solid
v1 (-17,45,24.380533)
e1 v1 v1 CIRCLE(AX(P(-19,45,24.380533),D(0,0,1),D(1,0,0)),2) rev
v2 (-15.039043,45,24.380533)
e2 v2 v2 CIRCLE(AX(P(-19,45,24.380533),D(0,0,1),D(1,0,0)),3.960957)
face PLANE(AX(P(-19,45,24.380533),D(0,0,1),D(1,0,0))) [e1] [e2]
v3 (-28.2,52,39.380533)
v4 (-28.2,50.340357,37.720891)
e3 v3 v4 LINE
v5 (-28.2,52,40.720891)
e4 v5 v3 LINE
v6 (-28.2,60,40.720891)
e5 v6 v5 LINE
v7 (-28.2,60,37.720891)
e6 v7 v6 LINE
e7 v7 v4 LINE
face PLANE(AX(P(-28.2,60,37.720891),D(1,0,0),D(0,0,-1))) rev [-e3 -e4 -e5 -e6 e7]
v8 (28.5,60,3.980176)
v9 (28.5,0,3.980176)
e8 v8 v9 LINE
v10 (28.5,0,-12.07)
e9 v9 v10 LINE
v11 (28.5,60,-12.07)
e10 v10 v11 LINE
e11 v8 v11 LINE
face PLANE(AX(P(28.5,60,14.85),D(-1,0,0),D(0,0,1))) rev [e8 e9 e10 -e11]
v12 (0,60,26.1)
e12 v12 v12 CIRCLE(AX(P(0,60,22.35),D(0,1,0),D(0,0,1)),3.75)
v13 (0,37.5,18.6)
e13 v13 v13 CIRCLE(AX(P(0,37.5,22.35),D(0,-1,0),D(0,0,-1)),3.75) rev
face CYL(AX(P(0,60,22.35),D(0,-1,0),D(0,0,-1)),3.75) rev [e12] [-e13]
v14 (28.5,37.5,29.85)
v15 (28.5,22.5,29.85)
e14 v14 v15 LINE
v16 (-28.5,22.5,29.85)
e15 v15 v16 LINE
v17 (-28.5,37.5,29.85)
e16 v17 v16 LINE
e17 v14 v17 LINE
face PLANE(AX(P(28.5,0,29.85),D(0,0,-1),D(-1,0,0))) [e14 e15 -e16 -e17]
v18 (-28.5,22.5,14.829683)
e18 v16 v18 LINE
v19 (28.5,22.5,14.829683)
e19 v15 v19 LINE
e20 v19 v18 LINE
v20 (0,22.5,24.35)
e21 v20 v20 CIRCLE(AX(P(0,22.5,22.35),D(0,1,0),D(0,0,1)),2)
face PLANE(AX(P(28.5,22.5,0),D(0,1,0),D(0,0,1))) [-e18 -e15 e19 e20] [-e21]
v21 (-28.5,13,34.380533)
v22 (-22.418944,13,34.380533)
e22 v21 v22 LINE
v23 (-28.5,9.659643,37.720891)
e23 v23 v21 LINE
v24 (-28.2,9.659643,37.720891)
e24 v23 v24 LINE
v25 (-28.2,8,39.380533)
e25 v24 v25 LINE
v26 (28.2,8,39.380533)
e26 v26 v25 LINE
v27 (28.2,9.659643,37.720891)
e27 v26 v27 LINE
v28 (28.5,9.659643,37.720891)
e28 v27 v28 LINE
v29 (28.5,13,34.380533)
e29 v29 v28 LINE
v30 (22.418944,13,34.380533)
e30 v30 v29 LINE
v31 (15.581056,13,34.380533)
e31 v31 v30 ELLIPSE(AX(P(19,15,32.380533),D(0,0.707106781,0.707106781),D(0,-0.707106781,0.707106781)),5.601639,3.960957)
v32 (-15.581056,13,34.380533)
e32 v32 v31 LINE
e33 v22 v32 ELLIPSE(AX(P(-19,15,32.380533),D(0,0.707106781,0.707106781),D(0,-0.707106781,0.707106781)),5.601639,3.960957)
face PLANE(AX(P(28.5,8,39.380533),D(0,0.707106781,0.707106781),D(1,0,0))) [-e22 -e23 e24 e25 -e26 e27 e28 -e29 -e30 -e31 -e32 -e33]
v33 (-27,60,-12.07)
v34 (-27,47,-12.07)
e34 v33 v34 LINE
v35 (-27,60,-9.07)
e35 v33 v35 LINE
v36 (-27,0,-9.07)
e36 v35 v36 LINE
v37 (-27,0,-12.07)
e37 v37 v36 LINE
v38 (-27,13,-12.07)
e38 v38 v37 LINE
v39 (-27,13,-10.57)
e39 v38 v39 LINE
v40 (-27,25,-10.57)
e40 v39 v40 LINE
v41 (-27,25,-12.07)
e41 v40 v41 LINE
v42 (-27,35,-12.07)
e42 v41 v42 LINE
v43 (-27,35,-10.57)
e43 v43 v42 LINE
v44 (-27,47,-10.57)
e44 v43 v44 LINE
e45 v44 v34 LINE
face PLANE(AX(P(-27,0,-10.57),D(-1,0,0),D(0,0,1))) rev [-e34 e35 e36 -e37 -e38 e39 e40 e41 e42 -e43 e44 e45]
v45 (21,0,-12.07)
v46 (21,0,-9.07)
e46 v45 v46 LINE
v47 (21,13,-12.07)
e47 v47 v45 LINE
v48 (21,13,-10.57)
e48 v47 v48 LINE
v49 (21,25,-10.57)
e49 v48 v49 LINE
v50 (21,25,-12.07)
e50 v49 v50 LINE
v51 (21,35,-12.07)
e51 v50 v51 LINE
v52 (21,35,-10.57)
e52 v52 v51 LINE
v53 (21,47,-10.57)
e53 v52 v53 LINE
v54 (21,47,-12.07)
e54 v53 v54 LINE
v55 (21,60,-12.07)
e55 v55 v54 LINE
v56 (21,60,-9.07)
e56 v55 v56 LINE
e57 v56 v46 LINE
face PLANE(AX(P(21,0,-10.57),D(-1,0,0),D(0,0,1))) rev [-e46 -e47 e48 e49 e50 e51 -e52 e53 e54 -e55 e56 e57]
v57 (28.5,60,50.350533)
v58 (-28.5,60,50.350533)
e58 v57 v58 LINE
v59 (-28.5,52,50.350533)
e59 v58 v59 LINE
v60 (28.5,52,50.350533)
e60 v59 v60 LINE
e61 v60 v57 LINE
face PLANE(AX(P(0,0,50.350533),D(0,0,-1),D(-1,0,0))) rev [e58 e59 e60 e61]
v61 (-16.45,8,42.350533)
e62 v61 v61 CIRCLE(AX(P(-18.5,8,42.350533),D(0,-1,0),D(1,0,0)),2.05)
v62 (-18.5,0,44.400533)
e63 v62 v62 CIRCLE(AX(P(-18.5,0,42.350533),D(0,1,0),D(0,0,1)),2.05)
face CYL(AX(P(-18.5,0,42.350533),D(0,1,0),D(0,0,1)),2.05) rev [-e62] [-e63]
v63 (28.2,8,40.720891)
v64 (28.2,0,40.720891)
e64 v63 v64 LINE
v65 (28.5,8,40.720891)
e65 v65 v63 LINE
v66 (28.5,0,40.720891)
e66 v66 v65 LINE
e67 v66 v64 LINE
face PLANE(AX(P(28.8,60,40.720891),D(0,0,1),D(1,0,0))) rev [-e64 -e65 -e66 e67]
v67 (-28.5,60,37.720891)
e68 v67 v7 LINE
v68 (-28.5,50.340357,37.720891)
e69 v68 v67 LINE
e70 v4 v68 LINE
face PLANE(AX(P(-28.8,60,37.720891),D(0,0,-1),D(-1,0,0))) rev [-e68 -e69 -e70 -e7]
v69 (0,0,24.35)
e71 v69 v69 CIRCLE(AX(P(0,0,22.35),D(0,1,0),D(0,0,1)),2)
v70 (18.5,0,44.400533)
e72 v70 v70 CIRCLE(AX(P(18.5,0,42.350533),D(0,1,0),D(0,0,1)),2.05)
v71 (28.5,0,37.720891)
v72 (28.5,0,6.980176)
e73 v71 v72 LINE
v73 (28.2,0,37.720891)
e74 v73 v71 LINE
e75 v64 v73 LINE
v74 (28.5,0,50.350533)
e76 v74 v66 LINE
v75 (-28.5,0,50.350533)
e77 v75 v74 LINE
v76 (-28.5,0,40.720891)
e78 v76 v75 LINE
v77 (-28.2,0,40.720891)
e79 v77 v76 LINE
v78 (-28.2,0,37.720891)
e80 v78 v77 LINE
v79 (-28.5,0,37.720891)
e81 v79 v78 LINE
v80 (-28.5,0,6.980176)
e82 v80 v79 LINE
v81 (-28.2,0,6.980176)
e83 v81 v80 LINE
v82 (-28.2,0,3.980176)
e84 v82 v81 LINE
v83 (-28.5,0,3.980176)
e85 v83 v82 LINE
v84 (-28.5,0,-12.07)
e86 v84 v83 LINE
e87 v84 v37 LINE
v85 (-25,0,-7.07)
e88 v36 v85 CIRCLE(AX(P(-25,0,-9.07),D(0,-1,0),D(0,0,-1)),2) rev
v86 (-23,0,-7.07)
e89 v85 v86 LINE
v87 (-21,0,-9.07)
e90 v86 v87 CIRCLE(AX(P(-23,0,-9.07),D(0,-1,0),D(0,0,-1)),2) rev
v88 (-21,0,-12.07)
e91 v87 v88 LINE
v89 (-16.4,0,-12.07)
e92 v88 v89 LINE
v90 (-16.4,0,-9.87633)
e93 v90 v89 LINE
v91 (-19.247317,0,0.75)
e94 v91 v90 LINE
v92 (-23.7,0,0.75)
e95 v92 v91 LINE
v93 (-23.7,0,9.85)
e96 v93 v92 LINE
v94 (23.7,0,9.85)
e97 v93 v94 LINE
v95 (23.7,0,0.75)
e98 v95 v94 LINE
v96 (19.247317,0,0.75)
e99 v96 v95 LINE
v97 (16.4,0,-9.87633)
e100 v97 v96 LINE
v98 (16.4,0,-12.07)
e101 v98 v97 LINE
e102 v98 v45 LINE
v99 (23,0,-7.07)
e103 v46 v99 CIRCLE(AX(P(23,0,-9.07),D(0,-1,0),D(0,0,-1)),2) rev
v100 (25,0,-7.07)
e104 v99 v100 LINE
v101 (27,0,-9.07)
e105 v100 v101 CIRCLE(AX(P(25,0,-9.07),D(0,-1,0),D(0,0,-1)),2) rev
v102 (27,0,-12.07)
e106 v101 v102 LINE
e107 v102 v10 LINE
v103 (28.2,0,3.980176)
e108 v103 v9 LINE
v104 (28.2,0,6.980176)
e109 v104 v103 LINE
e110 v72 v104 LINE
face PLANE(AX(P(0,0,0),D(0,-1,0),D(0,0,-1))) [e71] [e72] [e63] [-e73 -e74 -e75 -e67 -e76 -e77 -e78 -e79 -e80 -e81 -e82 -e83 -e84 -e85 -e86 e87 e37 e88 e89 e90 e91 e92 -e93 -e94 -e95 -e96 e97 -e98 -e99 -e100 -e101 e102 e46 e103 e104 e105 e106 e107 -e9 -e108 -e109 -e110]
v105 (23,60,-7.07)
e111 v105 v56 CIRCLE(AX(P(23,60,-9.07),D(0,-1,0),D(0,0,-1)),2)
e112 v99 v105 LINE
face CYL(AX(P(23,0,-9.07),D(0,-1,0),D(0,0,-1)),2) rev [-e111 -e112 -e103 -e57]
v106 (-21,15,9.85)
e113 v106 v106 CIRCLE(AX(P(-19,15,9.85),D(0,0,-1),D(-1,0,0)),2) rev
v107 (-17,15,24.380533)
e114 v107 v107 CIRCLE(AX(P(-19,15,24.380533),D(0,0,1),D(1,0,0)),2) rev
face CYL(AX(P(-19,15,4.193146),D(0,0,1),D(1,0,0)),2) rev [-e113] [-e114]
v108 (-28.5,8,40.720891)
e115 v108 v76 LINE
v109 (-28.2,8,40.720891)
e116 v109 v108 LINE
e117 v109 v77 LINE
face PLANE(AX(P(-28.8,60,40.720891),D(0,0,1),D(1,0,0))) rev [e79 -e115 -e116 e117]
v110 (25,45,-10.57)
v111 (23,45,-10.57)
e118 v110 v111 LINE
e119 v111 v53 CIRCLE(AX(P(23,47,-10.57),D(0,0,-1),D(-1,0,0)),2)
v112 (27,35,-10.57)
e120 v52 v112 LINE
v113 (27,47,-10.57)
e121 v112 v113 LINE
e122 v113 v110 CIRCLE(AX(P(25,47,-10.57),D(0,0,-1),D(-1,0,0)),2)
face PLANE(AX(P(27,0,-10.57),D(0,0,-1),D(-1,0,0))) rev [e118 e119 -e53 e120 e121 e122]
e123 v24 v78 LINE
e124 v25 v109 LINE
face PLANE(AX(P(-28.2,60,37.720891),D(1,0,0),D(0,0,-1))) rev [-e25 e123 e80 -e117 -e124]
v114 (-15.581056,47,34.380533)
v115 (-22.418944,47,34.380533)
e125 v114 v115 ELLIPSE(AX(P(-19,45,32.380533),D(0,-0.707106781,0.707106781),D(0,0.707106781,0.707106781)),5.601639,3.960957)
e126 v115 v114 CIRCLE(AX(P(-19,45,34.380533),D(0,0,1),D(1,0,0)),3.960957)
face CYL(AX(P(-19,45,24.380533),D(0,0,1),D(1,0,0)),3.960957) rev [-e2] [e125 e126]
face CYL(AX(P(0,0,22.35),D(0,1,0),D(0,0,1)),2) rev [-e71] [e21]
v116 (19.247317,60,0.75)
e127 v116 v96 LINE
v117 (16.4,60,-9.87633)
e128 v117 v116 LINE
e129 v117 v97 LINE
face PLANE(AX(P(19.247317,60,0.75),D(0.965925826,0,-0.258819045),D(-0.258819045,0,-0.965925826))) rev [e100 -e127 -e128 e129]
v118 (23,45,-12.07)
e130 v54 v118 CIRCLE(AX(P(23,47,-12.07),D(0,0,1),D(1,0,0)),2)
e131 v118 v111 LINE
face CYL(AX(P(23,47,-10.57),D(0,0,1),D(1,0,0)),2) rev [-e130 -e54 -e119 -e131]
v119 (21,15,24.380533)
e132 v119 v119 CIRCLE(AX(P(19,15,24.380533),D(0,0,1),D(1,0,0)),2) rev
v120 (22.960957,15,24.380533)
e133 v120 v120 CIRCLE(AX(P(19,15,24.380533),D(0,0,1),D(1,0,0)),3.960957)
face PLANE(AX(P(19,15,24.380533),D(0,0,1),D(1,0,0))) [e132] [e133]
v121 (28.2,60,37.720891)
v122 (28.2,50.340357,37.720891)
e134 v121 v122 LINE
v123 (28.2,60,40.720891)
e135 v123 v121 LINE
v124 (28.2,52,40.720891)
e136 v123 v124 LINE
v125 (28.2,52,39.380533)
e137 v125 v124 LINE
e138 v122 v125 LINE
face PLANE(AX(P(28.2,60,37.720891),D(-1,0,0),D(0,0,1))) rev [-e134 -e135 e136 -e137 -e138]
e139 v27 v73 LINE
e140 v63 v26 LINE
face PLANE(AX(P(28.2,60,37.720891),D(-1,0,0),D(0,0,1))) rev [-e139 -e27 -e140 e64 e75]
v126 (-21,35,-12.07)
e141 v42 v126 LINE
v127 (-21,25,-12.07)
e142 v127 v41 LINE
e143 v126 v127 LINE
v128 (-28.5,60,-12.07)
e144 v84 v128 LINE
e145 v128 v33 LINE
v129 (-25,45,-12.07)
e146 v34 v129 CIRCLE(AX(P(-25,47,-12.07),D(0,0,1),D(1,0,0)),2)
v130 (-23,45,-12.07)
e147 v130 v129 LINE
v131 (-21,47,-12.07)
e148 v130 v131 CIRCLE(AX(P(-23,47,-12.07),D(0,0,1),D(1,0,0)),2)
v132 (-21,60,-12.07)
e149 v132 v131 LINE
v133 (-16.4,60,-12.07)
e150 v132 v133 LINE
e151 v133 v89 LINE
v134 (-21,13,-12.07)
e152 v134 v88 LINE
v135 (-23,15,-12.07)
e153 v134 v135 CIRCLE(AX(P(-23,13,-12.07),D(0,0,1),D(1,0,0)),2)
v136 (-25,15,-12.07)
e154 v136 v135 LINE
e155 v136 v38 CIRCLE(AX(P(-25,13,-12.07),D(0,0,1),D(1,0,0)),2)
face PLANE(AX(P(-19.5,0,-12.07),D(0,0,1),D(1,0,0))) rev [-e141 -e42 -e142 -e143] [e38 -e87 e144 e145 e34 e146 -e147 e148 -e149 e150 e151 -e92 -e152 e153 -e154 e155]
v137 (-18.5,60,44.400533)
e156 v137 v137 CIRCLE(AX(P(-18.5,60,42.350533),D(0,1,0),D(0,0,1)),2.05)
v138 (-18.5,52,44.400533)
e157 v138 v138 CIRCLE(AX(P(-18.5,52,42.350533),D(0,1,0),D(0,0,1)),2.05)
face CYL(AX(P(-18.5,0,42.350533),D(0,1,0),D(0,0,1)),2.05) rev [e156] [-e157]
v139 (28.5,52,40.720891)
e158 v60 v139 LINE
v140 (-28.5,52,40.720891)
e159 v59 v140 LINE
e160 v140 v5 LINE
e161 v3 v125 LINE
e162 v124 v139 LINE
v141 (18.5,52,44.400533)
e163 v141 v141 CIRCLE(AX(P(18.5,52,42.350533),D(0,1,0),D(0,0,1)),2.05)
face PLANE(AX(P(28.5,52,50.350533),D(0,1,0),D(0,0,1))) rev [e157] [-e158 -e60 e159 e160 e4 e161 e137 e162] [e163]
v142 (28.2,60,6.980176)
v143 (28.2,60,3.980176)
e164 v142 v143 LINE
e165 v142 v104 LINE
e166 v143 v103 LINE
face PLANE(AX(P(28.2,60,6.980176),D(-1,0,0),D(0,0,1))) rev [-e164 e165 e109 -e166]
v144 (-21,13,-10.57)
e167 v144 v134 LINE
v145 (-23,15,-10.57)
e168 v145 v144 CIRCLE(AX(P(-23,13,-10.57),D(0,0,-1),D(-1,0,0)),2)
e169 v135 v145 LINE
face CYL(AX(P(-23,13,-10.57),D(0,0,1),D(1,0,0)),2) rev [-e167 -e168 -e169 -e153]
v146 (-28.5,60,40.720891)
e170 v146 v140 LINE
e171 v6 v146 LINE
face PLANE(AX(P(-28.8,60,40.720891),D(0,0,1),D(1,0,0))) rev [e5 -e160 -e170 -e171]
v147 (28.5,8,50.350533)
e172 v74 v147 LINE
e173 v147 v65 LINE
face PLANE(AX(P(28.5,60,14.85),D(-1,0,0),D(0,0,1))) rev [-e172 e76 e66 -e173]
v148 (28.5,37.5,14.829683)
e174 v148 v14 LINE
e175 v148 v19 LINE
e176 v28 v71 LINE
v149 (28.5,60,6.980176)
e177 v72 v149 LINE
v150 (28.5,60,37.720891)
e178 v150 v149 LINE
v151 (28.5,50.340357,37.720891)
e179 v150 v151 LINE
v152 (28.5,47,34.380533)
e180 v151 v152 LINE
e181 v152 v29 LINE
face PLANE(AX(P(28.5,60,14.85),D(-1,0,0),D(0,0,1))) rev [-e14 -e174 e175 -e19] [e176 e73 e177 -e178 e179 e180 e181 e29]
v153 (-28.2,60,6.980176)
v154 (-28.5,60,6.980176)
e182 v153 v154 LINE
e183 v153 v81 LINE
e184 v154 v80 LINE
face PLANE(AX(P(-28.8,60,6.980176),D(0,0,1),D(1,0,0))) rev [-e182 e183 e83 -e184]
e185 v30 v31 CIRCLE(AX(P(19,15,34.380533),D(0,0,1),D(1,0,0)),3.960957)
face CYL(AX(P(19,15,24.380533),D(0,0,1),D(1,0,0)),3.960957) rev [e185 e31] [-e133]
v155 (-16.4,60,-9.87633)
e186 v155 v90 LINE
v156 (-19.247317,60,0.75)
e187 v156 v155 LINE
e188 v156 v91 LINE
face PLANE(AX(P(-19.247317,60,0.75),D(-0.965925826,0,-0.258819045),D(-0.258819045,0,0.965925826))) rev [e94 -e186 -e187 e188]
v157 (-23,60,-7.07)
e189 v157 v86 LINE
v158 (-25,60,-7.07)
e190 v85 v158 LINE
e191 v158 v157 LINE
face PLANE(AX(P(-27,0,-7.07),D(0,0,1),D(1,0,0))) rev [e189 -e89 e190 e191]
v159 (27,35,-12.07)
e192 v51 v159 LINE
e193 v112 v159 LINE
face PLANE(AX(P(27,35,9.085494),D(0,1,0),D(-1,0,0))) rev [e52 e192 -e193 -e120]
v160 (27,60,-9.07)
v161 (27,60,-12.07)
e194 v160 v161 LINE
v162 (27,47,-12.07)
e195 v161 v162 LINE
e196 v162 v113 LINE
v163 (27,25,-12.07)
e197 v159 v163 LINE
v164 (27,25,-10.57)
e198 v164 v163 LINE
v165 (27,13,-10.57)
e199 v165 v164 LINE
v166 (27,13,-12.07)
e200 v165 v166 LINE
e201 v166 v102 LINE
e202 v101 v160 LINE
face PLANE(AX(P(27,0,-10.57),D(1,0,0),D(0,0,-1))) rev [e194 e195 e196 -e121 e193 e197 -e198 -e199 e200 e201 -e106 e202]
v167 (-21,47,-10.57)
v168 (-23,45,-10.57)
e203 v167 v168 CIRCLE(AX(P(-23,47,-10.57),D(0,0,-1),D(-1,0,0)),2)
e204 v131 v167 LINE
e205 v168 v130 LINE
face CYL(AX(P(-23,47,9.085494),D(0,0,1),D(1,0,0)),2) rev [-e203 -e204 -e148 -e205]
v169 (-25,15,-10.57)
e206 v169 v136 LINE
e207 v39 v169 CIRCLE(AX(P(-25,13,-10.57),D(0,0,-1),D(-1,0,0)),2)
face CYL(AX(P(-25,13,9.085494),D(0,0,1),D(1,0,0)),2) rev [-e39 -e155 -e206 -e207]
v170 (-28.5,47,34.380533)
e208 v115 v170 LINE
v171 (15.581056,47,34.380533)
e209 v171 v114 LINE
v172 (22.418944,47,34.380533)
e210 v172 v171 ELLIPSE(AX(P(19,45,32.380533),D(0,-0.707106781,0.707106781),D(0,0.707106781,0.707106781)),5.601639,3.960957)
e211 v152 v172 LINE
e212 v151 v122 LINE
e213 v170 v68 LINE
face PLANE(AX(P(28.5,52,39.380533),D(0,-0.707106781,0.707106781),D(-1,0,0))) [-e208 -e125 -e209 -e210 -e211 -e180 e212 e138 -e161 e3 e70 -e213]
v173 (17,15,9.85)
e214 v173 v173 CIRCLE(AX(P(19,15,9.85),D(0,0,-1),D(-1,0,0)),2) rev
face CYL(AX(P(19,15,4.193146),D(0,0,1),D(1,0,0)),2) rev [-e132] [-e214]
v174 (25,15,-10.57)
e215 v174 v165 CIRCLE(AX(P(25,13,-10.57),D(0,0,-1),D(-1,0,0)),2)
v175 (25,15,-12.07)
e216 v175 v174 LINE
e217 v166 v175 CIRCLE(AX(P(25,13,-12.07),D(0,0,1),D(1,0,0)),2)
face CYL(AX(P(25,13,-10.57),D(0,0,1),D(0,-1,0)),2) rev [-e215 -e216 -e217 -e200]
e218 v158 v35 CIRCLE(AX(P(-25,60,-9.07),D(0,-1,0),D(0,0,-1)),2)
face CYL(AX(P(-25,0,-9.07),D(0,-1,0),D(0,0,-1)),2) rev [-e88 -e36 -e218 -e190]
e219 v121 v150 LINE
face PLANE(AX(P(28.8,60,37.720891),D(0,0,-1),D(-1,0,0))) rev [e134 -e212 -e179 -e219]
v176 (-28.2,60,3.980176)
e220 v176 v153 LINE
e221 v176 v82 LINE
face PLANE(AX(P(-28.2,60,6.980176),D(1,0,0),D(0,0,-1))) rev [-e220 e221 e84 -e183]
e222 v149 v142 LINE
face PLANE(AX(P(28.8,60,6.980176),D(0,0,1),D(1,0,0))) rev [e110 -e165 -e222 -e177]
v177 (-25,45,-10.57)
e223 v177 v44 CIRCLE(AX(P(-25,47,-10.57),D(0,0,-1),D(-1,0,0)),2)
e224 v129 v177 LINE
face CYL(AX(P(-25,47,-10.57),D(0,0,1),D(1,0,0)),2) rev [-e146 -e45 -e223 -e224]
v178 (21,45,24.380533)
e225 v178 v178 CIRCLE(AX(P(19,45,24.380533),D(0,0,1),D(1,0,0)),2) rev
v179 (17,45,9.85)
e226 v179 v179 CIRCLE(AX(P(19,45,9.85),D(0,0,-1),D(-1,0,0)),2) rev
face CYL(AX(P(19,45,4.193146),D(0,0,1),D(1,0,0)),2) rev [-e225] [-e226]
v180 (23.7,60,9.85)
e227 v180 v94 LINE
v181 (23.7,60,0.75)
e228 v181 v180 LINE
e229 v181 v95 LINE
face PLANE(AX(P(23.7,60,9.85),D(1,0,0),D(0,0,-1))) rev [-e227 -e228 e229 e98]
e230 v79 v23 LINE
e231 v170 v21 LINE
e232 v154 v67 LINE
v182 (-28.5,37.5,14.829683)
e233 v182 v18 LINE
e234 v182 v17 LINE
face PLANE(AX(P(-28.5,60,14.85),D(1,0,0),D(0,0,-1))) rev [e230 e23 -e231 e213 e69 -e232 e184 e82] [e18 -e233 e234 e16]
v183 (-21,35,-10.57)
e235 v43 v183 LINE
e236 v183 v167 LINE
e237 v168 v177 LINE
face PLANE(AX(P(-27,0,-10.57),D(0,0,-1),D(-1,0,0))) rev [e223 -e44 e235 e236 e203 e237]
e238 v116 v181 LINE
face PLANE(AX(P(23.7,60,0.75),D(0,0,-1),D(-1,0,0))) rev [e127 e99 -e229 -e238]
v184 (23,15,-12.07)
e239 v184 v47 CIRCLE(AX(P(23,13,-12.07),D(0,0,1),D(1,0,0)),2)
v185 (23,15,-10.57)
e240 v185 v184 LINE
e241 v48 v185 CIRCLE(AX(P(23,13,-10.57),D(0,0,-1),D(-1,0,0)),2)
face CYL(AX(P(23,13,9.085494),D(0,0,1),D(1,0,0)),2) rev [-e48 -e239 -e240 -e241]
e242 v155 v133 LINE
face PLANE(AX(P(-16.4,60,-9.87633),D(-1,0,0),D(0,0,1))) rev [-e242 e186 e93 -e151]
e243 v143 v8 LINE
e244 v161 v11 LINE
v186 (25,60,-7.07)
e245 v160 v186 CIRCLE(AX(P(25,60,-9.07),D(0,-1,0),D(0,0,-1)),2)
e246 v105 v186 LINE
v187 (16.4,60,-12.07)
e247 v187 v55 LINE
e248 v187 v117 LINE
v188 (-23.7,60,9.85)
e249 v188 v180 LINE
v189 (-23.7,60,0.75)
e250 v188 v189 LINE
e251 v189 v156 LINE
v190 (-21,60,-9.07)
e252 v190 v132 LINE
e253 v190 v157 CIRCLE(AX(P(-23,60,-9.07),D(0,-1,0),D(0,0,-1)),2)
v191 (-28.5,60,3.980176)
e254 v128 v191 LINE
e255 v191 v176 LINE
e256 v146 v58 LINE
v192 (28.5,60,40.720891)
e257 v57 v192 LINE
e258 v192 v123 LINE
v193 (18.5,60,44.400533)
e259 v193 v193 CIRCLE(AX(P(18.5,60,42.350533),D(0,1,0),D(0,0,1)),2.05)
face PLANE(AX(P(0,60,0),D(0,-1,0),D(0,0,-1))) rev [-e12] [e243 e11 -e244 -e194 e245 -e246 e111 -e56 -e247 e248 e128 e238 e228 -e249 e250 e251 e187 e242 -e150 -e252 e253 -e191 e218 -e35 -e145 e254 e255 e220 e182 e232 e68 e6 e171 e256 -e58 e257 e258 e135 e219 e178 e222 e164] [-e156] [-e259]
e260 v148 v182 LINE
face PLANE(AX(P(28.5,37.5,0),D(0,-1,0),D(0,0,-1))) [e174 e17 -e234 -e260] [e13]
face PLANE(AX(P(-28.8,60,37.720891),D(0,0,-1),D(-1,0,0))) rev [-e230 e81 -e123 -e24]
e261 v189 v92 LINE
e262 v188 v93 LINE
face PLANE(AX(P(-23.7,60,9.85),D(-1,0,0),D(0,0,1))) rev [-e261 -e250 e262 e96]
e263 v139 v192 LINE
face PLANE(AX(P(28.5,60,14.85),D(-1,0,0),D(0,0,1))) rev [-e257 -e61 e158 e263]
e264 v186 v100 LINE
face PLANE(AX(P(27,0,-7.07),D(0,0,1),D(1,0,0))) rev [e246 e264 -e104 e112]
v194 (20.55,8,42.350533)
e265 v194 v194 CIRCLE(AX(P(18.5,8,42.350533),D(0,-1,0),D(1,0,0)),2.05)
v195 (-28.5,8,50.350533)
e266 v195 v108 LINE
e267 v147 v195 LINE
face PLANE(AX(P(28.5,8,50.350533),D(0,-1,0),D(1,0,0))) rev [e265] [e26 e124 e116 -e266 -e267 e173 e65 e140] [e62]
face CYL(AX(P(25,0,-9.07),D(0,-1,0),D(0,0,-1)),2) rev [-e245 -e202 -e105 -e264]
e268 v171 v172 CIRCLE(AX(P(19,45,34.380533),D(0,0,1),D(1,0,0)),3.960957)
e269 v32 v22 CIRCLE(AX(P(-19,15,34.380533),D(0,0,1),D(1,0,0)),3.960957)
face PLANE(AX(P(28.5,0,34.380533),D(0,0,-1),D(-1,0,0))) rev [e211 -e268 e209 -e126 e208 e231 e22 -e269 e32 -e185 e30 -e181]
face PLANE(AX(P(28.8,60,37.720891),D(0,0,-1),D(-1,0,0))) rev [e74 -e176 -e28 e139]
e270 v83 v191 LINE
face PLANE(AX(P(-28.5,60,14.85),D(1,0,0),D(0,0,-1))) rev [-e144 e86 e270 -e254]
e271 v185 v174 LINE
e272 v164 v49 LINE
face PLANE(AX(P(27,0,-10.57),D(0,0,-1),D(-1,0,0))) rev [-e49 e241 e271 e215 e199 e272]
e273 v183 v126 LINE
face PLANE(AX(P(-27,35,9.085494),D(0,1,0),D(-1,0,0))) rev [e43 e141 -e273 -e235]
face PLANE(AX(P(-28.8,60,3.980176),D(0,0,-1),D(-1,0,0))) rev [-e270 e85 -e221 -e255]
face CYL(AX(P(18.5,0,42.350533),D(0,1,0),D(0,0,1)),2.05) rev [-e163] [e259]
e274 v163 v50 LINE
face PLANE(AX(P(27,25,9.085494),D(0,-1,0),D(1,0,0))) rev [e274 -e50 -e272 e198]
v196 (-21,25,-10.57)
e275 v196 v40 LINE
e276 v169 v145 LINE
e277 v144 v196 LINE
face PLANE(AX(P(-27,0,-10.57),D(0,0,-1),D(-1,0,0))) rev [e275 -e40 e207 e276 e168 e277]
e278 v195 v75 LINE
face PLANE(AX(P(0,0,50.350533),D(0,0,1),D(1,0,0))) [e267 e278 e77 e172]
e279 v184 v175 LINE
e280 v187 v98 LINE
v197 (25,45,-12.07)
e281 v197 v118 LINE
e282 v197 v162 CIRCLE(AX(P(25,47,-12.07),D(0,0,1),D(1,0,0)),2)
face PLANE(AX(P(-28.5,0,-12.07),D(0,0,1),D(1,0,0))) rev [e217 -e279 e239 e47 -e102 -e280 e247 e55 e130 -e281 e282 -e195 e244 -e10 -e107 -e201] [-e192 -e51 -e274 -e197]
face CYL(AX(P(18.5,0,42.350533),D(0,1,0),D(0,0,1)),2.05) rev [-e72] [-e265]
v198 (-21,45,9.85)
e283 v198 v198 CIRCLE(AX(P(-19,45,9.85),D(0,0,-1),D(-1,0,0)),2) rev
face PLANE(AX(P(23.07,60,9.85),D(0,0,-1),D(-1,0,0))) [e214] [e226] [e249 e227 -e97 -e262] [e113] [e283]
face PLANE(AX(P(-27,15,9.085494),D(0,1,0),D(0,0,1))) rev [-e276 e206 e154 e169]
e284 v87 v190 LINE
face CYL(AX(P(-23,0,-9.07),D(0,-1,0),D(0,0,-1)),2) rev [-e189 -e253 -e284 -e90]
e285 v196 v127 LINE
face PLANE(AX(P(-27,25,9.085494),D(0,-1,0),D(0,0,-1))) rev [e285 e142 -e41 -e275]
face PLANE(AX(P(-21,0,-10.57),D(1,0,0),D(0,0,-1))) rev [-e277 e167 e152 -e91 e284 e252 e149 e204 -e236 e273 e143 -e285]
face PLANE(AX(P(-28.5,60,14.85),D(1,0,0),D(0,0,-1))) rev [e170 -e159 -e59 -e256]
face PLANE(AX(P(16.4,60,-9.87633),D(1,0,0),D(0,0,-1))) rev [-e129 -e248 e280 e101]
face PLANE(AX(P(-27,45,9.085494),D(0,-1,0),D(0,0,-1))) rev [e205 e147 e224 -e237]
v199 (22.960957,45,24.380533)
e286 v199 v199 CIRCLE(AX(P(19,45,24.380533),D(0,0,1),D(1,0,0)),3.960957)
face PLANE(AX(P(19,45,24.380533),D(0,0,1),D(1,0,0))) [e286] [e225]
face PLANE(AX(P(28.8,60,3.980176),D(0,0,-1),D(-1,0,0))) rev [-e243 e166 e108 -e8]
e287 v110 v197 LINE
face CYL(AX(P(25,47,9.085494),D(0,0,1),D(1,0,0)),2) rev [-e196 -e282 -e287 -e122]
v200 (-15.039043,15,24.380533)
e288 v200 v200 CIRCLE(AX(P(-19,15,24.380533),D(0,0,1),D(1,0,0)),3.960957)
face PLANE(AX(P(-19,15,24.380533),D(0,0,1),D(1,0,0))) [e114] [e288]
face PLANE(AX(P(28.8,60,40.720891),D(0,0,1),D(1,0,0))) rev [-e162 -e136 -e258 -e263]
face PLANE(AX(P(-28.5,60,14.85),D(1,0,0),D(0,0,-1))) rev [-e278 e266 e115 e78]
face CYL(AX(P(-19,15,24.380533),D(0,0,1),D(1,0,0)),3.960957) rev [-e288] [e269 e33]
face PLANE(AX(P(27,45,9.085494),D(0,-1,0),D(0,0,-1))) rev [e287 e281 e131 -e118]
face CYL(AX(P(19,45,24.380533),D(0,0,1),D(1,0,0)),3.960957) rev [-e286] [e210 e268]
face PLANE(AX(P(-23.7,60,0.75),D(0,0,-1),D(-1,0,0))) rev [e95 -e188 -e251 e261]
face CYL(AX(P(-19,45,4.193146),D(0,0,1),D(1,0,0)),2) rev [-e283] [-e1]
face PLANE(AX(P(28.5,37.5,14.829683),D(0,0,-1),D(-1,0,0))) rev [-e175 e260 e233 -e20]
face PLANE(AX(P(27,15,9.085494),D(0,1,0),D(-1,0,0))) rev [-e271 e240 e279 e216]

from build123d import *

# Parameters (mm, degrees)
SKETCH1_W            = 57
SKETCH1_H            = 28.7
BOSS_EXTRUDE1_DEPTH  = 60
SKETCH2_W            = 9
SKETCH2_H            = 4
CUT_EXTRUDE1_DEPTH   = 69.064473112
BOSS_EXTRUDE2_DEPTH  = 28.5
SKETCH6_W            = 15.5
SKETCH6_H            = 15.390476131
CUT_EXTRUDE2_DEPTH   = 80
BOSS_EXTRUDE5_DEPTH  = 60
SKETCH10_R           = 2
CUT_EXTRUDE3_DEPTH   = 24.530533394
SKETCH11_W           = 61.984050455
SKETCH11_H           = 43.227353824
SKETCH11_W_2         = 6
SKETCH11_H_2         = 2.542732203
CUT_EXTRUDE4_DEPTH   = 77.839254789
SKETCH13_W           = 6.011053281
SKETCH13_H           = 2.620549071
CUT_EXTRUDE5_DEPTH   = 77.839254789
SKETCH14_W           = 9
SKETCH14_H           = 4
BOSS_EXTRUDE7_DEPTH  = 60
SKETCH12_W           = 10.230058637
SKETCH12_H           = 6.686923691
BOSS_EXTRUDE6_DEPTH  = 60
SKETCH15_W           = 9
SKETCH15_H           = 4
BOSS_EXTRUDE8_DEPTH  = 60
SKETCH16_W           = 9
SKETCH16_H           = 1.78
CUT_EXTRUDE6_DEPTH   = 77.839254789
SKETCH17_W           = 25.75
SKETCH17_H           = 20.1006285
CUT_EXTRUDE7_DEPTH   = 77.839254789
SKETCH18_W           = 32.4
SKETCH18_H           = 12.613288226
CUT_EXTRUDE8_DEPTH   = 75.79485996
SKETCH19_W           = 57
SKETCH19_H           = 3.949842852
CUT_EXTRUDE9_DEPTH   = 75.79485996
SKETCH20_W           = 6
SKETCH20_H           = 3.5
CUT_EXTRUDE10_DEPTH  = 75.79485996
SKETCH21_W           = 6
SKETCH21_H           = 3.5
CUT_EXTRUDE11_DEPTH  = 1.5
SKETCH23_R           = 3.75
CUT_EXTRUDE12_DEPTH  = 59.313986952
SKETCH24_R           = 2
CUT_EXTRUDE13_DEPTH  = 59.313986952
SKETCH25_R           = 3.960956754
CUT_EXTRUDE14_DEPTH  = 10
SKETCH26_W           = 6
SKETCH26_H           = 10
SKETCH26_H_2         = 15
CUT_EXTRUDE15_DEPTH  = 5
SKETCH28_W           = 15.020317418
SKETCH28_H           = 14.99999997
CUT_EXTRUDE18_DEPTH  = 90.615964406
SKETCH32_W           = 57
SKETCH32_H           = 8
BOSS_EXTRUDE10_DEPTH = 15.97
SKETCH33_R           = 2.05
CUT_EXTRUDE20_DEPTH  = 84.351222025
FILLET2_R            = 2
CHAMFER1_SIZE        = 5
CUT_EXTRUDE21_DEPTH  = 84.351222025
SKETCH36_W           = 0.6
SKETCH36_H           = 3
CUT_EXTRUDE22_DEPTH  = 84.351222025


with BuildPart() as part:
    # Sketch1 → Boss-Extrude1 (new body)
    with BuildSketch(Plane(origin=(0, 0, 0), x_dir=(1, 0, 0), z_dir=(0, 1, 0))):
        with Locations((0, -0.5)):
            Rectangle(SKETCH1_W, SKETCH1_H)
        Polygon((23.07, -9.85), (-23.07, -9.85), (-23.5, -9.42), (-23.5, -0.95), (-19.09385128, -0.95), (-19, -0.599742255), (-16.2, 9.85), (16.2, 9.85), (19, -0.599742255), (19.09385128, -0.95), (23.5, -0.95), (23.5, -2.9), (23.5, -9.42), align=None, mode=Mode.SUBTRACT)
    extrude(amount=BOSS_EXTRUDE1_DEPTH)

    # Sketch2 → Cut-Extrude1 (cut, through all)
    with BuildSketch(Plane.XZ):
        with Locations((24, -10.0706285)):
            Rectangle(SKETCH2_W, SKETCH2_H)
        with Locations((-24, -10.0706285)):
            Rectangle(SKETCH2_W, SKETCH2_H)
    extrude(amount=-CUT_EXTRUDE1_DEPTH, mode=Mode.SUBTRACT)

    # Sketch5 → Boss-Extrude2 (add, symmetric)
    with BuildSketch(Plane(origin=(0, 0, 0), x_dir=(0, 0, -1), z_dir=(1, 0, 0))):
        with BuildLine():
            Line((-14.85, 0), (-14.85, 23.200000017))
            Line((-14.85, 23.200000017), (-15.549999973, 22.50000003))
            Line((-15.549999973, 22.50000003), (-29.149999973, 22.50000003))
            Line((-29.149999973, 22.50000003), (-29.849999973, 23.20000003))
            Line((-29.849999973, 23.20000003), (-29.849999973, 25.743360053))
            ThreePointArc((-29.849999973, 25.743360053), (-29.773879502, 26.126043492), (-29.557106746, 26.450466847))
            Line((-29.557106746, 26.450466847), (-27.237157266, 28.770416328))
            ThreePointArc((-27.237157266, 28.770416328), (-27.150448162, 28.900185674), (-27.119999973, 29.053259055))
            Line((-27.119999973, 29.053259055), (-27.119999973, 30.615319642))
            ThreePointArc((-27.119999973, 30.615319642), (-27.150448164, 30.768393021), (-27.237157268, 30.898162365))
            Line((-27.237157268, 30.898162365), (-27.431588163, 31.09259326))
            ThreePointArc((-27.431588163, 31.09259326), (-27.613507965, 31.297692563), (-27.620638933, 31.57175403))
            ThreePointArc((-27.620638933, 31.57175403), (-28.017573243, 32.42857618), (-28.828543655, 32.91234062))
            ThreePointArc((-28.828543655, 32.91234062), (-29.01918836, 33.020436377), (-29.124259054, 33.212764861))
            Line((-29.124259054, 33.212764861), (-29.156235284, 33.354092333))
            ThreePointArc((-29.156235284, 33.354092333), (-29.24659278, 33.53064407), (-29.410649592, 33.642090719))
            Line((-29.410649592, 33.642090719), (-29.585724304, 33.70524196))
            ThreePointArc((-29.585724304, 33.70524196), (-29.777329878, 33.851609246), (-29.849999973, 34.081511694))
            Line((-29.849999973, 34.081511694), (-29.849999973, 34.837490602))
            ThreePointArc((-29.849999973, 34.837490602), (-29.772088513, 35.074680338), (-29.568705112, 35.219471078))
            Line((-29.568705112, 35.219471078), (-29.427668799, 35.263299846))
            ThreePointArc((-29.427668799, 35.263299846), (-29.25116358, 35.375371369), (-29.155313737, 35.561185593))
            Line((-29.155313737, 35.561185593), (-29.125010632, 35.702102112))
            ThreePointArc((-29.125010632, 35.702102112), (-29.020526118, 35.897067182), (-28.828406063, 36.006695082))
            ThreePointArc((-28.828406063, 36.006695082), (-28.025619489, 36.481556021), (-27.62403672, 37.32339358))
            ThreePointArc((-27.62403672, 37.32339358), (-27.540484938, 37.407225271), (-27.43605838, 37.46293655))
            Line((-27.43605838, 37.46293655), (-27.39899493, 37.5))
            Line((-27.39899493, 37.5), (-17.30100503, 37.5))
            Line((-17.30100503, 37.5), (-17.26394158, 37.46293655))
            ThreePointArc((-17.26394158, 37.46293655), (-17.159515017, 37.407225278), (-17.07596324, 37.32339358))
            ThreePointArc((-17.07596324, 37.32339358), (-16.674380468, 36.481556018), (-15.871593887, 36.006695079))
            ThreePointArc((-15.871593887, 36.006695079), (-15.679473839, 35.897067189), (-15.574989331, 35.702102127))
            Line((-15.574989331, 35.702102127), (-15.544686222, 35.561185587))
            ThreePointArc((-15.544686222, 35.561185587), (-15.448836377, 35.375371364), (-15.272331158, 35.263299843))
            Line((-15.272331158, 35.263299843), (-15.131294869, 35.219471083))
            ThreePointArc((-15.131294869, 35.219471083), (-14.927911462, 35.074680333), (-14.85, 34.837490586))
            Line((-14.85, 34.837490586), (-14.85, 60))
            Line((-14.85, 60), (-34.380533394, 60))
            Line((-34.380533394, 60), (-34.380533394, 0))
            Line((-34.380533394, 0), (-14.85, 0))
        make_face()
        with BuildLine():
            ThreePointArc((-15.142893227, 26.450466847), (-14.926120471, 26.126043492), (-14.85, 25.743360053))
            Line((-14.85, 25.743360053), (-14.85, 34.081511674))
            ThreePointArc((-14.85, 34.081511674), (-14.922670087, 33.851609245), (-15.114275644, 33.70524197))
            Line((-15.114275644, 33.70524197), (-15.289350386, 33.642090718))
            ThreePointArc((-15.289350386, 33.642090718), (-15.453407192, 33.53064407), (-15.543764688, 33.354092339))
            Line((-15.543764688, 33.354092339), (-15.57574092, 33.21276486))
            ThreePointArc((-15.57574092, 33.21276486), (-15.680811613, 33.020436377), (-15.871456319, 32.91234062))
            ThreePointArc((-15.871456319, 32.91234062), (-16.68242673, 32.42857618), (-17.07936104, 31.57175403))
            ThreePointArc((-17.07936104, 31.57175403), (-17.086492012, 31.297692565), (-17.26841181, 31.09259326))
            Line((-17.26841181, 31.09259326), (-17.462842708, 30.898162362))
            ThreePointArc((-17.462842708, 30.898162362), (-17.549551812, 30.768393016), (-17.58, 30.615319635))
            Line((-17.58, 30.615319635), (-17.58, 29.053259048))
            ThreePointArc((-17.58, 29.053259048), (-17.54955181, 28.900185669), (-17.462842705, 28.770416325))
            Line((-17.462842705, 28.770416325), (-15.142893227, 26.450466847))
        make_face()
    extrude(amount=BOSS_EXTRUDE2_DEPTH, both=True)

    # Sketch6 → Cut-Extrude2 (cut)
    with BuildSketch(Plane(origin=(0, 60, 0), x_dir=(1, 0, 0), z_dir=(0, 1, 0))):
        with Locations((0, 12.050145064)):
            Rectangle(SKETCH6_W, SKETCH6_H)
    extrude(amount=-CUT_EXTRUDE2_DEPTH, mode=Mode.SUBTRACT)

    # Sketch9 → Boss-Extrude5 (add)
    with BuildSketch(Plane(origin=(0, 60, 0), x_dir=(1, 0, 0), z_dir=(0, 1, 0))):
        Polygon((-19.5, 13.85), (-19.5, 29.1706285), (-28.5, 29.1706285), (-28.5, 26.1706285), (-33.5, 26.1706285), (-33.5, 32.1706285), (-14.5, 32.1706285), (-14.5, 13.85), align=None)
        Polygon((30.2, 12.85), (30.2, 28.735786438), (19.5, 28.735786438), (19.5, 13.85), (14.5, 13.85), (14.5, 32.1706285), (33.5, 32.1706285), (33.5, 12.85), align=None)
    extrude(amount=-BOSS_EXTRUDE5_DEPTH)

    # Sketch10 → Cut-Extrude3 (cut)
    with BuildSketch(Plane.XY.offset(34.380533394)):
        with Locations((19, 45)):
            Circle(SKETCH10_R)
        with Locations((19, 15)):
            Circle(SKETCH10_R)
        with Locations((-19, 15)):
            Circle(SKETCH10_R)
        with Locations((-19, 45)):
            Circle(SKETCH10_R)
    extrude(amount=-CUT_EXTRUDE3_DEPTH, mode=Mode.SUBTRACT)

    # Sketch11 → Cut-Extrude4 (cut, through all)
    with BuildSketch(Plane.XZ):
        with Locations((44.734239641, -35.463676912)):
            Rectangle(SKETCH11_W, SKETCH11_H)
        with Locations((32.2, -12.566438328)):
            Rectangle(SKETCH11_W_2, SKETCH11_H_2)
    extrude(amount=-CUT_EXTRUDE4_DEPTH, mode=Mode.SUBTRACT)


with BuildPart() as cut_extrude4_piece_1:
    # of the separate pieces the step leaves, piece 1, a body of its own (cut_extrude4_pieces)
    add(part.part.solids().sort_by_distance((-28.5, 23.200000017, 14.85))[0])

    # Sketch14 → Boss-Extrude7 (add, through all)
    with BuildSketch(Plane(origin=(0, 0, 0), x_dir=(-1, 0, 0), z_dir=(0, -1, 0))):
        with Locations((-24, 10.0706285)):
            Rectangle(SKETCH14_W, SKETCH14_H)
    extrude(amount=-BOSS_EXTRUDE7_DEPTH)

    # Sketch12 → Boss-Extrude6 (add, through all)
    with BuildSketch(Plane.XZ):
        with Locations((23.384970682, -10.506538155)):
            Rectangle(SKETCH12_W, SKETCH12_H)
    extrude(amount=-BOSS_EXTRUDE6_DEPTH)

    # Sketch15 → Boss-Extrude8 (add, through all)
    with BuildSketch(Plane(origin=(0, 60, 0), x_dir=(1, 0, 0), z_dir=(0, 1, 0))):
        with Locations((-24, 10.0706285)):
            Rectangle(SKETCH15_W, SKETCH15_H)
    extrude(amount=-BOSS_EXTRUDE8_DEPTH)

    # Sketch16 → Cut-Extrude6 (cut, through all)
    with BuildSketch(Plane(origin=(0, 60, 0), x_dir=(1, 0, 0), z_dir=(0, 1, 0))):
        with Locations((-24, 12.96)):
            Rectangle(SKETCH16_W, SKETCH16_H)
    extrude(amount=-CUT_EXTRUDE6_DEPTH, mode=Mode.SUBTRACT)

    # Sketch17 → Cut-Extrude7 (cut, through all)
    with BuildSketch(Plane(origin=(0, 60, 0), x_dir=(1, 0, 0), z_dir=(0, 1, 0))):
        with Locations((-20.625, 22.12031425)):
            Rectangle(SKETCH17_W, SKETCH17_H)
    extrude(amount=-CUT_EXTRUDE7_DEPTH, mode=Mode.SUBTRACT)

    # Sketch18 → Cut-Extrude8 (cut, through all)
    with BuildSketch(Plane(origin=(0, 60, 0), x_dir=(1, 0, 0), z_dir=(0, 1, 0))):
        with Locations((0, 16.156644113)):
            Rectangle(SKETCH18_W, SKETCH18_H)
    extrude(amount=-CUT_EXTRUDE8_DEPTH, mode=Mode.SUBTRACT)

    # Sketch19 → Cut-Extrude9 (cut, through all)
    with BuildSketch(Plane(origin=(0, 60, 0), x_dir=(1, 0, 0), z_dir=(0, 1, 0))):
        with Locations((0, 14.044921426)):
            Rectangle(SKETCH19_W, SKETCH19_H)
    extrude(amount=-CUT_EXTRUDE9_DEPTH, mode=Mode.SUBTRACT)

    # Sketch20 → Cut-Extrude10 (cut, through all)
    with BuildSketch(Plane(origin=(0, 60, 0), x_dir=(1, 0, 0), z_dir=(0, 1, 0))):
        with Locations((-24, 8.82)):
            Rectangle(SKETCH20_W, SKETCH20_H)
        with Locations((24, 8.82)):
            Rectangle(SKETCH20_W, SKETCH20_H)
    extrude(amount=-CUT_EXTRUDE10_DEPTH, mode=Mode.SUBTRACT)

    # Sketch21 → Cut-Extrude11 (cut)
    with BuildSketch(Plane(origin=(0, 0, -12.07), x_dir=(-1, 0, 0), z_dir=(0, 0, -1))):
        with Locations((-24, 48.25)):
            Rectangle(SKETCH21_W, SKETCH21_H)
        with Locations((24, 48.25)):
            Rectangle(SKETCH21_W, SKETCH21_H)
        with Locations((24, 11.75)):
            Rectangle(SKETCH21_W, SKETCH21_H)
        with Locations((-24, 11.75)):
            Rectangle(SKETCH21_W, SKETCH21_H)
    extrude(amount=-CUT_EXTRUDE11_DEPTH, mode=Mode.SUBTRACT)

    # Sketch23 → Cut-Extrude12 (cut, through all)
    with BuildSketch(Plane(origin=(0, 22.50000003, 0), x_dir=(1, 0, 0), z_dir=(0, 1, 0))):
        with Locations(Location((0, -22.349999973, 0), (0, 0, 90))):
            Circle(SKETCH23_R)
    extrude(amount=CUT_EXTRUDE12_DEPTH, mode=Mode.SUBTRACT)

    # Sketch24 → Cut-Extrude13 (cut, through all)
    with BuildSketch(Plane(origin=(0, 22.50000003, 0), x_dir=(1, 0, 0), z_dir=(0, 1, 0))):
        with Locations(Location((0, -22.349999973, 0), (0, 0, 270))):
            Circle(SKETCH24_R)
    extrude(amount=-CUT_EXTRUDE13_DEPTH, mode=Mode.SUBTRACT)

    # Sketch25 → Cut-Extrude14 (cut)
    with BuildSketch(Plane.XY.offset(34.380533394)):
        with Locations((19, 15)):
            Circle(SKETCH25_R)
        with Locations((-19, 15)):
            Circle(SKETCH25_R)
        with Locations((19, 45)):
            Circle(SKETCH25_R)
        with Locations((-19, 45)):
            Circle(SKETCH25_R)
    extrude(amount=-CUT_EXTRUDE14_DEPTH, mode=Mode.SUBTRACT)

    # Sketch26 → Cut-Extrude15 (cut)
    with BuildSketch(Plane(origin=(0, 0, -12.07), x_dir=(-1, 0, 0), z_dir=(0, 0, -1))):
        with Locations((24, 30)):
            Rectangle(SKETCH26_W, SKETCH26_H)
        with Locations((24, 7.5)):
            Rectangle(SKETCH26_W, SKETCH26_H_2)
        with Locations((24, 52.5)):
            Rectangle(SKETCH26_W, SKETCH26_H_2)
        with Locations((-24, 30)):
            Rectangle(SKETCH26_W, SKETCH26_H)
        with Locations((-24, 52.5)):
            Rectangle(SKETCH26_W, SKETCH26_H_2)
        with Locations((-24, 7.5)):
            Rectangle(SKETCH26_W, SKETCH26_H_2)
    extrude(amount=-CUT_EXTRUDE15_DEPTH, mode=Mode.SUBTRACT)

    # Sketch28 → Cut-Extrude18 (cut, through all)
    with BuildSketch(Plane.ZY.offset(28.5)):
        with Locations((22.339841264, 30.000000015)):
            Rectangle(SKETCH28_W, SKETCH28_H)
    extrude(amount=-CUT_EXTRUDE18_DEPTH, mode=Mode.SUBTRACT)

    # Sketch32 → Boss-Extrude10 (add)
    with BuildSketch(Plane.XY.offset(34.380533394)):
        with Locations((0, 4)):
            Rectangle(SKETCH32_W, SKETCH32_H)
        with Locations((0, 56)):
            Rectangle(SKETCH32_W, SKETCH32_H)
    extrude(amount=BOSS_EXTRUDE10_DEPTH)

    # Sketch33 → Cut-Extrude20 (cut, through all)
    with BuildSketch(Plane(origin=(0, 60, 0), x_dir=(1, 0, 0), z_dir=(0, 1, 0))):
        with Locations(Location((18.5, -42.350533394, 0), (0, 0, 270))):
            Circle(SKETCH33_R)
        with Locations(Location((-18.5, -42.350533394, 0), (0, 0, 270))):
            Circle(SKETCH33_R)
    extrude(amount=-CUT_EXTRUDE20_DEPTH, mode=Mode.SUBTRACT)

    # Fillet2
    fillet2_edges = [cut_extrude4_piece_1.edges().sort_by_distance(p)[0] for p in [
        (-27, 30, -7.07),
        (-21, 30, -7.07),
        (27, 30, -7.07),
        (21, 30, -7.07),
        (-21, 15, -11.32),
        (-27, 15, -11.32),
        (-27, 45, -11.32),
        (-21, 45, -11.32),
        (21, 45, -11.32),
        (27, 45, -11.32),
        (27, 15, -11.32),
        (21, 15, -11.32),
    ]]
    fillet(fillet2_edges, radius=FILLET2_R)

    # Chamfer1
    # the kernel refuses this chamfer: 5 mm, written as the material it adds along each edge
    with BuildSketch(Plane(origin=(-28.5, 52, 34.380533394), x_dir=(0, 0.027495876610586317, 0.9996219169112968), z_dir=(1, 0, 0))) as chamfer1_piece_1_section:
        Polygon((CHAMFER1_SIZE * 0.999621916911, CHAMFER1_SIZE * 0.0274958766106), (-CHAMFER1_SIZE * 0.0274958766106, CHAMFER1_SIZE * 0.999621916911), (0, 0), align=None)
    chamfer1_piece_1 = extrude(amount=57, mode=Mode.PRIVATE)
    chamfer1_piece_1 = chamfer1_piece_1 - Plane(origin=(-19, 45, 36.059443485), x_dir=(1, 0, 0), z_dir=(0, 0, 1)) * Cylinder(3.960956754, 134, mode=Mode.PRIVATE)
    chamfer1_piece_1 = chamfer1_piece_1 - Plane(origin=(19, 45, 36.059443485), x_dir=(1, 0, 0), z_dir=(0, 0, 1)) * Cylinder(3.960956754, 134, mode=Mode.PRIVATE)
    add(chamfer1_piece_1)
    with BuildSketch(Plane(origin=(-28.5, 8, 34.380533394), x_dir=(0, 0.9996219169112968, -0.027495876610586317), z_dir=(1, 0, 0))) as chamfer1_piece_2_section:
        Polygon((CHAMFER1_SIZE * 0.999621916911, CHAMFER1_SIZE * 0.0274958766106), (-CHAMFER1_SIZE * 0.0274958766106, CHAMFER1_SIZE * 0.999621916911), (0, 0), align=None)
    chamfer1_piece_2 = extrude(amount=57, mode=Mode.PRIVATE)
    chamfer1_piece_2 = chamfer1_piece_2 - Plane(origin=(-19, 15, 36.059443438), x_dir=(1, 0, 0), z_dir=(0, 0, 1)) * Cylinder(3.960956754, 134, mode=Mode.PRIVATE)
    chamfer1_piece_2 = chamfer1_piece_2 - Plane(origin=(19, 15, 36.059443438), x_dir=(1, 0, 0), z_dir=(0, 0, 1)) * Cylinder(3.960956754, 134, mode=Mode.PRIVATE)
    add(chamfer1_piece_2)

    # Sketch35 → Cut-Extrude21 (cut, through all)
    with BuildSketch(Plane.XZ):
        Polygon((-16.2, -12.07), (-16.2, -9.85), (-19.09385128, 0.95), (-23.5, 0.95), (-23.5, 9.42), (-23.07, 9.85), (-23.7, 9.85), (-23.7, 0.75), (-19.247316678, 0.75), (-16.4, -9.8763305), (-16.4, -12.07), align=None)
        Polygon((16.4, -12.07), (16.2, -12.07), (16.2, -9.85), (19.09385128, 0.95), (23.5, 0.95), (23.5, 9.42), (23.07, 9.85), (23.7, 9.85), (23.7, 0.75), (19.247316678, 0.75), (16.4, -9.8763305), align=None)
    extrude(amount=-CUT_EXTRUDE21_DEPTH, mode=Mode.SUBTRACT)

    # Sketch36 → Cut-Extrude22 (cut, through all)
    with BuildSketch(Plane.XZ):
        with Locations((-28.5, 39.220890667)):
            Rectangle(SKETCH36_W, SKETCH36_H)
        with Locations((-28.5, 5.480176119)):
            Rectangle(SKETCH36_W, SKETCH36_H)
        with Locations((28.5, 5.480176119)):
            Rectangle(SKETCH36_W, SKETCH36_H)
        with Locations((28.5, 39.220890667)):
            Rectangle(SKETCH36_W, SKETCH36_H)
    extrude(amount=-CUT_EXTRUDE22_DEPTH, mode=Mode.SUBTRACT)


with BuildPart() as cut_extrude4_piece_2:
    # of the separate pieces the step leaves, piece 2, a body of its own (cut_extrude4_pieces)
    add(part.part.solids().sort_by_distance((33.5, 0, -13.85))[0])

    # Sketch13 → Cut-Extrude5 (cut, through all)
    with BuildSketch(Plane.XZ):
        with Locations((32.65361778, -14.054923964)):
            Rectangle(SKETCH13_W, SKETCH13_H)
    extrude(amount=-CUT_EXTRUDE5_DEPTH, mode=Mode.SUBTRACT)


solid = cut_extrude4_piece_1.part
